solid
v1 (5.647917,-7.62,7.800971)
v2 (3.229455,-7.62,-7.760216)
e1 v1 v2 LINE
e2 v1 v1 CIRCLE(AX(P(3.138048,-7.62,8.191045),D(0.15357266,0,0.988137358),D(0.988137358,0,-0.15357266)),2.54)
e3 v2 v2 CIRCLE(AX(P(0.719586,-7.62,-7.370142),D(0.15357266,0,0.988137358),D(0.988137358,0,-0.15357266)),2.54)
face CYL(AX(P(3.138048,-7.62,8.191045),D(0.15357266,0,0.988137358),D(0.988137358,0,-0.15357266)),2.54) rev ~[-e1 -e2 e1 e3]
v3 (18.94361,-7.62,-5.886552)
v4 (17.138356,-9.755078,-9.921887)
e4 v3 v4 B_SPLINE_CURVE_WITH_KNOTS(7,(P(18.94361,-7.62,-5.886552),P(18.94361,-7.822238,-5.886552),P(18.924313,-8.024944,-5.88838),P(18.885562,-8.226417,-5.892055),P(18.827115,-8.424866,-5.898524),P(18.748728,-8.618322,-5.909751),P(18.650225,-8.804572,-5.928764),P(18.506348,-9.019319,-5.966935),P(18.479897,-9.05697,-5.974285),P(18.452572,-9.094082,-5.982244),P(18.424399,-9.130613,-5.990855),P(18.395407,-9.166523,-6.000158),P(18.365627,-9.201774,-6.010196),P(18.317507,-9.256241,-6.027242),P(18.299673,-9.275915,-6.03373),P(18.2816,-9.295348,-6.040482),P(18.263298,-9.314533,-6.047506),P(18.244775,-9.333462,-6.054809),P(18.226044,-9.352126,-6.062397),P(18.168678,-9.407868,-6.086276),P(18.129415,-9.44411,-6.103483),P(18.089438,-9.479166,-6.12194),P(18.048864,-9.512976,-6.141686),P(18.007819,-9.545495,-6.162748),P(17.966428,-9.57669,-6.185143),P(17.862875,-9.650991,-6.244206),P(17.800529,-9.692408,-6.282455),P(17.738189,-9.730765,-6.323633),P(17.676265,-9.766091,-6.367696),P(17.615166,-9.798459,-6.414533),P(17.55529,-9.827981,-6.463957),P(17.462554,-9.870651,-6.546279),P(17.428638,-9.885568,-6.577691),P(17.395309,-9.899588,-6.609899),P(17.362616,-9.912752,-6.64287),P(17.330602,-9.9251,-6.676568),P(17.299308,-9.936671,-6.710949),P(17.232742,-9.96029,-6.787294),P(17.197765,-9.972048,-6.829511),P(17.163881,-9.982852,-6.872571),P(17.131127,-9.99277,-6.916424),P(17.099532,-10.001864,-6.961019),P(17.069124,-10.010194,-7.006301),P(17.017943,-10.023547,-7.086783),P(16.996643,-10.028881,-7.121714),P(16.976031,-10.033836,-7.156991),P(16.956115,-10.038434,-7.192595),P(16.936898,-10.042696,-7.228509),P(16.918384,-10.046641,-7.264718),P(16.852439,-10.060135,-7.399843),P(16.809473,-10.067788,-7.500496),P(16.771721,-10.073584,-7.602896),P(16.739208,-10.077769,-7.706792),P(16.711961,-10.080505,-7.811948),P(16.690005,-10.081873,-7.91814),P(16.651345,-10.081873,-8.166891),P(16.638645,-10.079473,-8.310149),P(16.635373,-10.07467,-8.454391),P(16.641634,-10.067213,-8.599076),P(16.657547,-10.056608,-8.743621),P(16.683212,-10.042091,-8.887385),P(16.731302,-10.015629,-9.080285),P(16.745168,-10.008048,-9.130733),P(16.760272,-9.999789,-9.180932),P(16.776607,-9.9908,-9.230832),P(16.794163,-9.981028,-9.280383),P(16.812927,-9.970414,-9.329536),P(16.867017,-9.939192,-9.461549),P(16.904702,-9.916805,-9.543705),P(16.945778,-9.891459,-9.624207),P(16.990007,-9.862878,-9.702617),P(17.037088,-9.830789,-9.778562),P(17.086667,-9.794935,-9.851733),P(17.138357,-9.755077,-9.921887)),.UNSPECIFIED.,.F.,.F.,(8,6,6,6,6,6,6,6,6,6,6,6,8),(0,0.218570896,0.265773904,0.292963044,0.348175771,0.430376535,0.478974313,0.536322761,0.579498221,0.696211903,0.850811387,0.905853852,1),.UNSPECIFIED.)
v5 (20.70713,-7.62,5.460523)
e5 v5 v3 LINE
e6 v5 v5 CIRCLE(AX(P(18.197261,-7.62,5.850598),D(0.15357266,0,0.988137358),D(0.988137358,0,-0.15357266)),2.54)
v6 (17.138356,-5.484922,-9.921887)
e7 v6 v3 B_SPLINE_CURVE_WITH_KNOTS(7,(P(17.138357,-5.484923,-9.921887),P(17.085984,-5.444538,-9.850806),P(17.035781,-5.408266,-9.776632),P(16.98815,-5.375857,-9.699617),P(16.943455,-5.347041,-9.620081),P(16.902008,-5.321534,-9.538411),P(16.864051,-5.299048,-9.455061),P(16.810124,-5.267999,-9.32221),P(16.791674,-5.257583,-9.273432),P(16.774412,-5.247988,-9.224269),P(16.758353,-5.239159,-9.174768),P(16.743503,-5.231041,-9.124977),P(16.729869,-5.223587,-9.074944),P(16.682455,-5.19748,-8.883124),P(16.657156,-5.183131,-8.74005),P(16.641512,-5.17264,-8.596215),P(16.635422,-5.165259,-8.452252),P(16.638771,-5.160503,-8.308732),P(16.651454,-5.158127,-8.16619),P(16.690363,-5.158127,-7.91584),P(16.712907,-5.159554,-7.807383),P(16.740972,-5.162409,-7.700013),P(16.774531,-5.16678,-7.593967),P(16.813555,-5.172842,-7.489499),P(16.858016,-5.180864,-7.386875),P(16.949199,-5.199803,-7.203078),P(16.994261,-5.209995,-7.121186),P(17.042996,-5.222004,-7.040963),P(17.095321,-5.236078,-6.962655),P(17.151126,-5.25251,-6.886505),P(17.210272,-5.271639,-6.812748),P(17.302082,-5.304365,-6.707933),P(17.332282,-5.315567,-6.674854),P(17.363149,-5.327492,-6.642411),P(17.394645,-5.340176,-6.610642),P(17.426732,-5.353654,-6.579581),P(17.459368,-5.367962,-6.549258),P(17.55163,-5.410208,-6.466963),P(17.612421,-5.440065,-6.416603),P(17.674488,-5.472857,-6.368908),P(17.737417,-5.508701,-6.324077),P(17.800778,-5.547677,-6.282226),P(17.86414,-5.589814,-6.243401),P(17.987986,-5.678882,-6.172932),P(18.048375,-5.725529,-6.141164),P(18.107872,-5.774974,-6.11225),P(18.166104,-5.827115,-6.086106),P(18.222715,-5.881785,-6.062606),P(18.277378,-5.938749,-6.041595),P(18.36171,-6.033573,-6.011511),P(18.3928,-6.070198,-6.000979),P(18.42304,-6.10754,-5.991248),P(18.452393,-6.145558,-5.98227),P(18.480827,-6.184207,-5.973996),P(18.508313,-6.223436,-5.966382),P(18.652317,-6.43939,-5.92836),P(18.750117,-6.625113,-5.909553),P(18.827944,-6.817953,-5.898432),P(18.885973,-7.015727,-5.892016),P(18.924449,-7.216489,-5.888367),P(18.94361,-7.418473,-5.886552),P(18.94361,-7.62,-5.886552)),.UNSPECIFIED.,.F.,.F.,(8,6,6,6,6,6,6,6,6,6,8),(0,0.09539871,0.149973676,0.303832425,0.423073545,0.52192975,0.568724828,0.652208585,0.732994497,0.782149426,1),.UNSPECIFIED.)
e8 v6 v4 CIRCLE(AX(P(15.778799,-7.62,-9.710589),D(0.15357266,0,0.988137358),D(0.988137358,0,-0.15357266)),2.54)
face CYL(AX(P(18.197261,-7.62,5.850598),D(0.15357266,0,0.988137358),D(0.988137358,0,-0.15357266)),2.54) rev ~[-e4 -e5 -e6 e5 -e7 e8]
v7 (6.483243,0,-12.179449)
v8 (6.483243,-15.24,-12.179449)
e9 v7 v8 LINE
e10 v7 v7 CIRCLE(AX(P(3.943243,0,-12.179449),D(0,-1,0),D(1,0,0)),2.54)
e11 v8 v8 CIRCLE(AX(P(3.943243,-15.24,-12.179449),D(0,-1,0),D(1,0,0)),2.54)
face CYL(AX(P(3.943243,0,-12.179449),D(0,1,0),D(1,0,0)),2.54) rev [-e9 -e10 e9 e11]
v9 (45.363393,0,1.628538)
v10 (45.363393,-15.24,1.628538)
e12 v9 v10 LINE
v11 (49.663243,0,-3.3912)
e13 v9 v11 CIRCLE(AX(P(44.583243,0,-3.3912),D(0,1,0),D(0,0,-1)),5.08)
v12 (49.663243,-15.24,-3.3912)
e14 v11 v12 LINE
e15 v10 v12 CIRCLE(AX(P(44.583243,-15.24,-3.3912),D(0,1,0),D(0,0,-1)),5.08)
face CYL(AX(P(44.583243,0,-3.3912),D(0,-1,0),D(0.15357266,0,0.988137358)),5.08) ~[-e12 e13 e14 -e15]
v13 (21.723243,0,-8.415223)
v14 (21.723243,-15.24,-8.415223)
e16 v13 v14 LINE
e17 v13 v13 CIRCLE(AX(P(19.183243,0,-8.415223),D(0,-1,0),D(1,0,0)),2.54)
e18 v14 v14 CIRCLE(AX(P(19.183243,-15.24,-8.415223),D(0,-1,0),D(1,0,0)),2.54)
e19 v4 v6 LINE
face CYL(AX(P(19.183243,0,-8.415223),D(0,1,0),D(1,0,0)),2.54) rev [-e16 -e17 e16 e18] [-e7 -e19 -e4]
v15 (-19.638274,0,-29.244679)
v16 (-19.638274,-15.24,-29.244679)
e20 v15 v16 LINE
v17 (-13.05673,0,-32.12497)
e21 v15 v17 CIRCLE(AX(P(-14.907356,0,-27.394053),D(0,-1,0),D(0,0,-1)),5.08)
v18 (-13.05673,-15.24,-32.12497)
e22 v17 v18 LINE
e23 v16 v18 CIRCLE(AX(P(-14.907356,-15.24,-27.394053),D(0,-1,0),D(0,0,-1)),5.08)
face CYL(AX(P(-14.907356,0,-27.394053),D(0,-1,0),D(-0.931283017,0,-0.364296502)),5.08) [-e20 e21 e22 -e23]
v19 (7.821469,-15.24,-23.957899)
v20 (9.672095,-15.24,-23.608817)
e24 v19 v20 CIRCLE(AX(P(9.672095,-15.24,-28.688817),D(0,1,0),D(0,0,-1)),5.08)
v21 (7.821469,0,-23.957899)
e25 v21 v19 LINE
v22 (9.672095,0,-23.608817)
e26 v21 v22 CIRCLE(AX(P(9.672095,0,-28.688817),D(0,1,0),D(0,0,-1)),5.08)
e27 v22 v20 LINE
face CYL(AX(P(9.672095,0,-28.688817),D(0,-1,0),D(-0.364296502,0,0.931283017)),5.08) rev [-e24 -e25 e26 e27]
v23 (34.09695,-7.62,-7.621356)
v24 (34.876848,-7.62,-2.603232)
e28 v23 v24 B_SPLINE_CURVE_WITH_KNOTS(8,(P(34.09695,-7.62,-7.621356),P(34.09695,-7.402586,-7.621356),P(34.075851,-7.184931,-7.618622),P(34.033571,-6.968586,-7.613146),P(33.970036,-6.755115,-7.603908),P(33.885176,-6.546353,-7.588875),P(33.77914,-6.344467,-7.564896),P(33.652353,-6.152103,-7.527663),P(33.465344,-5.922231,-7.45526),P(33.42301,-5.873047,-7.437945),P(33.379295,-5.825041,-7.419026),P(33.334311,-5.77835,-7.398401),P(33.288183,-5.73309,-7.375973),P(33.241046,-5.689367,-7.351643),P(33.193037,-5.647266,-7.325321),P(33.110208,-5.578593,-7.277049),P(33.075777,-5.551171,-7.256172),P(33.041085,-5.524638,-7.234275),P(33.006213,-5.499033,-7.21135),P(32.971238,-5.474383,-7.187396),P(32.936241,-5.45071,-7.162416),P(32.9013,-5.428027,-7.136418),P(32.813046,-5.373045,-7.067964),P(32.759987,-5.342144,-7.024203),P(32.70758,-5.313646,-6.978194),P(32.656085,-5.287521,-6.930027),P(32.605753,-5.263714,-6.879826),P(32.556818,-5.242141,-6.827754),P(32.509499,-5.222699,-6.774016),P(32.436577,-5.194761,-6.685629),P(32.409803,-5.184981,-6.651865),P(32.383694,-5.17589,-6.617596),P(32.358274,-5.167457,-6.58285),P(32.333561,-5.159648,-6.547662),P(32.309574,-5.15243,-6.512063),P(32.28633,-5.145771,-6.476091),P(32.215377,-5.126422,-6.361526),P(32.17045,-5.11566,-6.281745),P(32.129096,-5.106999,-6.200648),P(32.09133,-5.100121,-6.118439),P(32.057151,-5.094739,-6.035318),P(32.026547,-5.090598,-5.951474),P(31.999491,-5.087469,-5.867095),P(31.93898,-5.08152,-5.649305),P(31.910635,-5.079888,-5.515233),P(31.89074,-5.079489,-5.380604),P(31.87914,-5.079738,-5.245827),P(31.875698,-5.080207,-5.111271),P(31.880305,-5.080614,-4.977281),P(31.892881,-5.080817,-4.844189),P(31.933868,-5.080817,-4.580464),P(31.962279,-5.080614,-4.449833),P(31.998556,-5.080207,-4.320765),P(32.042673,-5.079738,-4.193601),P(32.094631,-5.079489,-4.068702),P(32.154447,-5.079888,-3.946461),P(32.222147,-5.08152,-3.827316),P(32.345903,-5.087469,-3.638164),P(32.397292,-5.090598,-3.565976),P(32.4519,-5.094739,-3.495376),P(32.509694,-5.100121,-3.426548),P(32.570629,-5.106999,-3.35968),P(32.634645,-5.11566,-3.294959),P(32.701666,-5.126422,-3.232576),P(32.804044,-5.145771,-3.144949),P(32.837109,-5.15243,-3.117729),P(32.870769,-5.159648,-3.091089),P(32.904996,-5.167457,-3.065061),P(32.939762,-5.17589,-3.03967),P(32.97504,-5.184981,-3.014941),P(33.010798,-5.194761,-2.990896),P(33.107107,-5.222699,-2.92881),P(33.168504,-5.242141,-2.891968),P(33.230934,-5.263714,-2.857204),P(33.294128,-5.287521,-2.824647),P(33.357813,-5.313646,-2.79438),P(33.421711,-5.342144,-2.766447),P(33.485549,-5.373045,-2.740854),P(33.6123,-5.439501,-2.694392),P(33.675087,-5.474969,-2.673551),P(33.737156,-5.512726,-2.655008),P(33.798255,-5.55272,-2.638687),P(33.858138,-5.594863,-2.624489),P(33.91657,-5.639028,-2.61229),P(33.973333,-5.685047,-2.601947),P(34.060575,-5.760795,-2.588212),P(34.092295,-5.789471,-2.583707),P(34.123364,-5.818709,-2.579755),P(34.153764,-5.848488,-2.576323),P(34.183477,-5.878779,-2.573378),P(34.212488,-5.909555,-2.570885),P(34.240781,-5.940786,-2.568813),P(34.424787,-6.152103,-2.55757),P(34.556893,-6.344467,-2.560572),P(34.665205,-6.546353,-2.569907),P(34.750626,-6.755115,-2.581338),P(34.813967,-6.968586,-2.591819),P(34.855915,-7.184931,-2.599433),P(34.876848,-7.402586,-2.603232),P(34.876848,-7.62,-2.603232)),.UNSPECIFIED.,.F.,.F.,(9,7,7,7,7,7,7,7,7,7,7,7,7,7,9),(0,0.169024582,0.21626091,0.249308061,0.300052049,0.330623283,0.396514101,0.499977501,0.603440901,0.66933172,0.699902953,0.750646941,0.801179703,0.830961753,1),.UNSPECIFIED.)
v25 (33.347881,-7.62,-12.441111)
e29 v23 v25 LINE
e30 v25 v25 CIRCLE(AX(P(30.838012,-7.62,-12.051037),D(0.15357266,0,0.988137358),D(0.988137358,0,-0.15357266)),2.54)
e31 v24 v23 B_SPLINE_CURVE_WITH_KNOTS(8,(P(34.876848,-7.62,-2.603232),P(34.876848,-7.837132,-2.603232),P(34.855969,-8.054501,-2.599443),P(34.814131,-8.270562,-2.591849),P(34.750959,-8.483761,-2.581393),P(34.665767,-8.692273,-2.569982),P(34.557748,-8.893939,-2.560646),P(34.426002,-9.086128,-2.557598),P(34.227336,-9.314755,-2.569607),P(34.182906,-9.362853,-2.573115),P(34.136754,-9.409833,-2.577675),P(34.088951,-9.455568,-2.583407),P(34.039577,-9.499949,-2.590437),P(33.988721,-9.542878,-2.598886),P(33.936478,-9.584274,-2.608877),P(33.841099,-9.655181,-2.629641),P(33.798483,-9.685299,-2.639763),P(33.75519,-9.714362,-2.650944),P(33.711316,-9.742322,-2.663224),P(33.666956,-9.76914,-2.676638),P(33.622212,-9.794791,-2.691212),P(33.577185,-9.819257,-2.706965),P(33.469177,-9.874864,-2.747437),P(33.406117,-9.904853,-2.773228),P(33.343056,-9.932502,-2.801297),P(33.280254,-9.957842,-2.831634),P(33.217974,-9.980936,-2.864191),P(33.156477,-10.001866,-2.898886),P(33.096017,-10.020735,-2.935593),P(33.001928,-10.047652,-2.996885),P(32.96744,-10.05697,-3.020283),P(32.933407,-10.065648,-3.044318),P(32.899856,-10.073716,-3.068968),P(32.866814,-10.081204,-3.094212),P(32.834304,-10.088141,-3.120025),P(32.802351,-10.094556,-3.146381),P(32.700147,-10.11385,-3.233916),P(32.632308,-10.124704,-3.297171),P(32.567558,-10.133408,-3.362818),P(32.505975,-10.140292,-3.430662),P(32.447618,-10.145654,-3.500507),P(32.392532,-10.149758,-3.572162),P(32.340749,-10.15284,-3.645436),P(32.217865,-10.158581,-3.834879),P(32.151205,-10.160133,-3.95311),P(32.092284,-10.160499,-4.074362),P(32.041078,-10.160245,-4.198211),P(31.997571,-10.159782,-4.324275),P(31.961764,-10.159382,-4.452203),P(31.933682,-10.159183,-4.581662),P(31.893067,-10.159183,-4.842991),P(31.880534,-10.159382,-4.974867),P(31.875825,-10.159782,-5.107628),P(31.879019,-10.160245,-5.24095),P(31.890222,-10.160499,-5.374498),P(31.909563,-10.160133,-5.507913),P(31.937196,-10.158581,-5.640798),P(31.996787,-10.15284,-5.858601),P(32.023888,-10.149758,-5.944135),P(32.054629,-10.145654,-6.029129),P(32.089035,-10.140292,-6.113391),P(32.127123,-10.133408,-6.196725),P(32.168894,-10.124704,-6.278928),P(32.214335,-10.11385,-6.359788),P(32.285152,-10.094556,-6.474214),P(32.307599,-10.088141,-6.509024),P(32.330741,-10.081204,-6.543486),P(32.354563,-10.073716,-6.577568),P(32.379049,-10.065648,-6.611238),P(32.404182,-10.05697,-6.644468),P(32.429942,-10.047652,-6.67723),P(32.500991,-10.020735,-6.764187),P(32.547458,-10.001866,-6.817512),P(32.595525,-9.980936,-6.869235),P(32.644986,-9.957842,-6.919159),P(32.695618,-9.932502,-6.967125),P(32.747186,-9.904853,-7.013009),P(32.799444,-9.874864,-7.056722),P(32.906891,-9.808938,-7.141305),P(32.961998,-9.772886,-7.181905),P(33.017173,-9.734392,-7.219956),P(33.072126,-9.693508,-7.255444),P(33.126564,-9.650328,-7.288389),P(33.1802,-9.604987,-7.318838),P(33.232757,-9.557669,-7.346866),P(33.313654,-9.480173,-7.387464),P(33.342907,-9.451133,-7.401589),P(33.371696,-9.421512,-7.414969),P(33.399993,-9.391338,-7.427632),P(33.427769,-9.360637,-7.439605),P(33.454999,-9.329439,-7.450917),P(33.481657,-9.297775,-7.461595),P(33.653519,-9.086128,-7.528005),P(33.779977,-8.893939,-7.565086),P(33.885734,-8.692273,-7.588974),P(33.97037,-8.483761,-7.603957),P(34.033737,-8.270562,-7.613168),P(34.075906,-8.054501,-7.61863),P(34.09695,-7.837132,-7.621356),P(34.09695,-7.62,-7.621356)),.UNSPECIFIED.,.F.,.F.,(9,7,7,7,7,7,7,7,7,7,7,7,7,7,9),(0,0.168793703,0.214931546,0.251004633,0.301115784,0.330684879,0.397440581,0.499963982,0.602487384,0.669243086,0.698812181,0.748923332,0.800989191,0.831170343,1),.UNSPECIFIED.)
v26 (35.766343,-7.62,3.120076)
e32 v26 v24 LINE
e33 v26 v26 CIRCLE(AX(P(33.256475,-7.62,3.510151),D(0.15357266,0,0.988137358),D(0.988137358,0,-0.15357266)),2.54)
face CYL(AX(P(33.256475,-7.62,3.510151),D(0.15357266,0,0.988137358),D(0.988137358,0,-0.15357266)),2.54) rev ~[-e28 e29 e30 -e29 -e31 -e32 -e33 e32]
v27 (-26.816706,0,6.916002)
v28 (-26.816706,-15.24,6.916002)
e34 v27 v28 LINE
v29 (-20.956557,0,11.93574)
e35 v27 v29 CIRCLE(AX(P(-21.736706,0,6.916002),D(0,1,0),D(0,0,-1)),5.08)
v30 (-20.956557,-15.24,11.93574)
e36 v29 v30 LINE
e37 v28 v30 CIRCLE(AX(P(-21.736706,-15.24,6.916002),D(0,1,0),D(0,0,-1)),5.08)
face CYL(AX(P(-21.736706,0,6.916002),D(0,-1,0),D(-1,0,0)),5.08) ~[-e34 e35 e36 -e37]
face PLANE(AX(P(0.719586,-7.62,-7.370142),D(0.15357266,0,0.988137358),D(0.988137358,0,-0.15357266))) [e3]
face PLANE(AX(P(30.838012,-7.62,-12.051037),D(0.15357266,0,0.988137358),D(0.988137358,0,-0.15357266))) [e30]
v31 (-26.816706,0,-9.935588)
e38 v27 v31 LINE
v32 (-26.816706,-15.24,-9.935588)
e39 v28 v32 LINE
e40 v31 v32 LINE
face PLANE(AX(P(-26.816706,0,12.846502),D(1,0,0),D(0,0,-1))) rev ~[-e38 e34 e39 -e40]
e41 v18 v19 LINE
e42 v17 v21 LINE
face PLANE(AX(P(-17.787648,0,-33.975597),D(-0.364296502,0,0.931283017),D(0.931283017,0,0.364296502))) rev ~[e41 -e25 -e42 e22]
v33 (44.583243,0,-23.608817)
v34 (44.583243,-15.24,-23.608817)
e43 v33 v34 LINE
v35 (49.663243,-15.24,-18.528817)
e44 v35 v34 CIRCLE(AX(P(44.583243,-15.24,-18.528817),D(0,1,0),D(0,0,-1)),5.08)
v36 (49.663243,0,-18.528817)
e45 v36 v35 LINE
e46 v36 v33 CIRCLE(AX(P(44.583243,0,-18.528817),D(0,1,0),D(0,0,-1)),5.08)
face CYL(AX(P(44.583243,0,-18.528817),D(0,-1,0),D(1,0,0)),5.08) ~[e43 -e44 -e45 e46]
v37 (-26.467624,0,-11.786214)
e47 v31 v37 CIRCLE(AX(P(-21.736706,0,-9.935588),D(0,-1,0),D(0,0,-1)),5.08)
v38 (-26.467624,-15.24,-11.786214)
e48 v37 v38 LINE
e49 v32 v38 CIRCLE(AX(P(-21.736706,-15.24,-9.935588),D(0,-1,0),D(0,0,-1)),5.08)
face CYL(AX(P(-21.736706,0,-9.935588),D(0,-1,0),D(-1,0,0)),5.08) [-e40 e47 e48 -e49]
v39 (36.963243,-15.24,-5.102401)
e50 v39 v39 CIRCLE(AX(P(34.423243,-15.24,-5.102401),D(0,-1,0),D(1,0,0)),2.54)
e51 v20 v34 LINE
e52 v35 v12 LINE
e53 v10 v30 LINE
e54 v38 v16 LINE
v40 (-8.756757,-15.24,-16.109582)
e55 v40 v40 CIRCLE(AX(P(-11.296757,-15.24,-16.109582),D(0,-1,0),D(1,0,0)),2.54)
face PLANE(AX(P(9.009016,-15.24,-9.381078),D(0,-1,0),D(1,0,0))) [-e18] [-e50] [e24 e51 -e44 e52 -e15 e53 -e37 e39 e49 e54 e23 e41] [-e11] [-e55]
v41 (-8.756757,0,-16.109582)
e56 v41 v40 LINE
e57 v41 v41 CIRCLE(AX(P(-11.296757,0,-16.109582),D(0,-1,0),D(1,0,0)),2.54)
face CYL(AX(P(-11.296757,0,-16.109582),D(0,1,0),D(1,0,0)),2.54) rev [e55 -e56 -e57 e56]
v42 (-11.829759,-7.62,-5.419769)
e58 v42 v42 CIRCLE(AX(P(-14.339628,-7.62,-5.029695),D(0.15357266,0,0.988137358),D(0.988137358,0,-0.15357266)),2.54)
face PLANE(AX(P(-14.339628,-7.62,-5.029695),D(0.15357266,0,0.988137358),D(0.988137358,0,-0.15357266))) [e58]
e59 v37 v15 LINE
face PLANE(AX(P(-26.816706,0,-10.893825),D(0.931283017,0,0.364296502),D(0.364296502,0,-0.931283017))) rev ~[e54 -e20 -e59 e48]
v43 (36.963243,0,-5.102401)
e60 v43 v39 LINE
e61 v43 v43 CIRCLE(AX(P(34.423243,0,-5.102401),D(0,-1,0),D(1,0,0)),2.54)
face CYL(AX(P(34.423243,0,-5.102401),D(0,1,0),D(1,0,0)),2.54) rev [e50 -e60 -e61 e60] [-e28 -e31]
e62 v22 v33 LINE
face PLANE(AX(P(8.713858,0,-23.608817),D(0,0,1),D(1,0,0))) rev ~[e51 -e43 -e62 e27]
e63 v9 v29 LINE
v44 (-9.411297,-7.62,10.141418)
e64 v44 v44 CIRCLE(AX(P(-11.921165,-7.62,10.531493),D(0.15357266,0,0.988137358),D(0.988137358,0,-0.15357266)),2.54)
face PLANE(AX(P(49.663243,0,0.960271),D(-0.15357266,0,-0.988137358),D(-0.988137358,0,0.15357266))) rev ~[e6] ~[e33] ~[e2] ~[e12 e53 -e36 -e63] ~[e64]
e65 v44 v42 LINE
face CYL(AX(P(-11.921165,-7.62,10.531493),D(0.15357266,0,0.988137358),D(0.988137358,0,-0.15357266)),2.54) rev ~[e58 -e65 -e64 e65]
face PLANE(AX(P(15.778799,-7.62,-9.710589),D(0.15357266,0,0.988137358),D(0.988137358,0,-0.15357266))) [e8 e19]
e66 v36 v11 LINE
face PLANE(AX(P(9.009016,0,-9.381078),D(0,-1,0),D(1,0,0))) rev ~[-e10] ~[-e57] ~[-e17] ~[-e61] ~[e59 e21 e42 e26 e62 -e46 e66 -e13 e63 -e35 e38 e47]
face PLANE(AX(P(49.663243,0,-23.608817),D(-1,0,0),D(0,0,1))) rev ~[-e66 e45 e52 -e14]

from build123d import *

# Parameters (mm, degrees)
F0_R     = 2.54
F1_DEPTH = 15.24
F2_R     = 5.08
F3_R     = 2.54
F4_DEPTH = 15.748


with BuildPart() as f1:
    # F0 (on Front) → F1 (new body)
    with BuildSketch(Plane.XZ):
        Polygon((-26.816706221, 12.8465024581), (-26.816706221, -10.6672204749), (-26.816706221, -10.8938248026), (-17.7876478214, -33.9755966375), (8.7138581745, -23.6088168675), (49.6632434885, -23.6088168675), (49.6632434885, 0.9602710623), align=None)
        with Locations((-11.2967565115, -16.1095818214)):
            Circle(F0_R, mode=Mode.SUBTRACT)
        with Locations((3.9432434885, -12.1794487806)):
            Circle(F0_R, mode=Mode.SUBTRACT)
        with Locations((19.1832434885, -8.4152225918)):
            Circle(F0_R, mode=Mode.SUBTRACT)
        with Locations((34.4232434885, -5.1024009119)):
            Circle(F0_R, mode=Mode.SUBTRACT)
    extrude(amount=F1_DEPTH)

    # F2
    f2_edges = [f1.edges().sort_by_distance(p)[0] for p in [
        (-26.816706, -7.62, 12.846502),
        (49.663243, -7.62, 0.960271),
        (49.663243, -7.62, -23.608817),
        (8.713858, -7.62, -23.608817),
        (-17.787648, -7.62, -33.975597),
        (-26.816706, -7.62, -10.893825),
    ]]
    fillet(f2_edges, radius=F2_R)

    # F3 (on face) → F4 (cut)
    with BuildSketch(Plane(origin=(1.3170078158, 0, 8.474064501), x_dir=(0.988137358, 0, -0.1535726597), z_dir=(0.1535726597, 0, 0.988137358))):
        with Locations((32.3229017764, -7.62)):
            Circle(F3_R)
        with Locations((17.0829017764, -7.62)):
            Circle(F3_R)
        with Locations((1.8429017764, -7.62)):
            Circle(F3_R)
        with Locations((-13.3970982236, -7.62)):
            Circle(F3_R)
    extrude(amount=-F4_DEPTH, mode=Mode.SUBTRACT)


solid = f1.part
